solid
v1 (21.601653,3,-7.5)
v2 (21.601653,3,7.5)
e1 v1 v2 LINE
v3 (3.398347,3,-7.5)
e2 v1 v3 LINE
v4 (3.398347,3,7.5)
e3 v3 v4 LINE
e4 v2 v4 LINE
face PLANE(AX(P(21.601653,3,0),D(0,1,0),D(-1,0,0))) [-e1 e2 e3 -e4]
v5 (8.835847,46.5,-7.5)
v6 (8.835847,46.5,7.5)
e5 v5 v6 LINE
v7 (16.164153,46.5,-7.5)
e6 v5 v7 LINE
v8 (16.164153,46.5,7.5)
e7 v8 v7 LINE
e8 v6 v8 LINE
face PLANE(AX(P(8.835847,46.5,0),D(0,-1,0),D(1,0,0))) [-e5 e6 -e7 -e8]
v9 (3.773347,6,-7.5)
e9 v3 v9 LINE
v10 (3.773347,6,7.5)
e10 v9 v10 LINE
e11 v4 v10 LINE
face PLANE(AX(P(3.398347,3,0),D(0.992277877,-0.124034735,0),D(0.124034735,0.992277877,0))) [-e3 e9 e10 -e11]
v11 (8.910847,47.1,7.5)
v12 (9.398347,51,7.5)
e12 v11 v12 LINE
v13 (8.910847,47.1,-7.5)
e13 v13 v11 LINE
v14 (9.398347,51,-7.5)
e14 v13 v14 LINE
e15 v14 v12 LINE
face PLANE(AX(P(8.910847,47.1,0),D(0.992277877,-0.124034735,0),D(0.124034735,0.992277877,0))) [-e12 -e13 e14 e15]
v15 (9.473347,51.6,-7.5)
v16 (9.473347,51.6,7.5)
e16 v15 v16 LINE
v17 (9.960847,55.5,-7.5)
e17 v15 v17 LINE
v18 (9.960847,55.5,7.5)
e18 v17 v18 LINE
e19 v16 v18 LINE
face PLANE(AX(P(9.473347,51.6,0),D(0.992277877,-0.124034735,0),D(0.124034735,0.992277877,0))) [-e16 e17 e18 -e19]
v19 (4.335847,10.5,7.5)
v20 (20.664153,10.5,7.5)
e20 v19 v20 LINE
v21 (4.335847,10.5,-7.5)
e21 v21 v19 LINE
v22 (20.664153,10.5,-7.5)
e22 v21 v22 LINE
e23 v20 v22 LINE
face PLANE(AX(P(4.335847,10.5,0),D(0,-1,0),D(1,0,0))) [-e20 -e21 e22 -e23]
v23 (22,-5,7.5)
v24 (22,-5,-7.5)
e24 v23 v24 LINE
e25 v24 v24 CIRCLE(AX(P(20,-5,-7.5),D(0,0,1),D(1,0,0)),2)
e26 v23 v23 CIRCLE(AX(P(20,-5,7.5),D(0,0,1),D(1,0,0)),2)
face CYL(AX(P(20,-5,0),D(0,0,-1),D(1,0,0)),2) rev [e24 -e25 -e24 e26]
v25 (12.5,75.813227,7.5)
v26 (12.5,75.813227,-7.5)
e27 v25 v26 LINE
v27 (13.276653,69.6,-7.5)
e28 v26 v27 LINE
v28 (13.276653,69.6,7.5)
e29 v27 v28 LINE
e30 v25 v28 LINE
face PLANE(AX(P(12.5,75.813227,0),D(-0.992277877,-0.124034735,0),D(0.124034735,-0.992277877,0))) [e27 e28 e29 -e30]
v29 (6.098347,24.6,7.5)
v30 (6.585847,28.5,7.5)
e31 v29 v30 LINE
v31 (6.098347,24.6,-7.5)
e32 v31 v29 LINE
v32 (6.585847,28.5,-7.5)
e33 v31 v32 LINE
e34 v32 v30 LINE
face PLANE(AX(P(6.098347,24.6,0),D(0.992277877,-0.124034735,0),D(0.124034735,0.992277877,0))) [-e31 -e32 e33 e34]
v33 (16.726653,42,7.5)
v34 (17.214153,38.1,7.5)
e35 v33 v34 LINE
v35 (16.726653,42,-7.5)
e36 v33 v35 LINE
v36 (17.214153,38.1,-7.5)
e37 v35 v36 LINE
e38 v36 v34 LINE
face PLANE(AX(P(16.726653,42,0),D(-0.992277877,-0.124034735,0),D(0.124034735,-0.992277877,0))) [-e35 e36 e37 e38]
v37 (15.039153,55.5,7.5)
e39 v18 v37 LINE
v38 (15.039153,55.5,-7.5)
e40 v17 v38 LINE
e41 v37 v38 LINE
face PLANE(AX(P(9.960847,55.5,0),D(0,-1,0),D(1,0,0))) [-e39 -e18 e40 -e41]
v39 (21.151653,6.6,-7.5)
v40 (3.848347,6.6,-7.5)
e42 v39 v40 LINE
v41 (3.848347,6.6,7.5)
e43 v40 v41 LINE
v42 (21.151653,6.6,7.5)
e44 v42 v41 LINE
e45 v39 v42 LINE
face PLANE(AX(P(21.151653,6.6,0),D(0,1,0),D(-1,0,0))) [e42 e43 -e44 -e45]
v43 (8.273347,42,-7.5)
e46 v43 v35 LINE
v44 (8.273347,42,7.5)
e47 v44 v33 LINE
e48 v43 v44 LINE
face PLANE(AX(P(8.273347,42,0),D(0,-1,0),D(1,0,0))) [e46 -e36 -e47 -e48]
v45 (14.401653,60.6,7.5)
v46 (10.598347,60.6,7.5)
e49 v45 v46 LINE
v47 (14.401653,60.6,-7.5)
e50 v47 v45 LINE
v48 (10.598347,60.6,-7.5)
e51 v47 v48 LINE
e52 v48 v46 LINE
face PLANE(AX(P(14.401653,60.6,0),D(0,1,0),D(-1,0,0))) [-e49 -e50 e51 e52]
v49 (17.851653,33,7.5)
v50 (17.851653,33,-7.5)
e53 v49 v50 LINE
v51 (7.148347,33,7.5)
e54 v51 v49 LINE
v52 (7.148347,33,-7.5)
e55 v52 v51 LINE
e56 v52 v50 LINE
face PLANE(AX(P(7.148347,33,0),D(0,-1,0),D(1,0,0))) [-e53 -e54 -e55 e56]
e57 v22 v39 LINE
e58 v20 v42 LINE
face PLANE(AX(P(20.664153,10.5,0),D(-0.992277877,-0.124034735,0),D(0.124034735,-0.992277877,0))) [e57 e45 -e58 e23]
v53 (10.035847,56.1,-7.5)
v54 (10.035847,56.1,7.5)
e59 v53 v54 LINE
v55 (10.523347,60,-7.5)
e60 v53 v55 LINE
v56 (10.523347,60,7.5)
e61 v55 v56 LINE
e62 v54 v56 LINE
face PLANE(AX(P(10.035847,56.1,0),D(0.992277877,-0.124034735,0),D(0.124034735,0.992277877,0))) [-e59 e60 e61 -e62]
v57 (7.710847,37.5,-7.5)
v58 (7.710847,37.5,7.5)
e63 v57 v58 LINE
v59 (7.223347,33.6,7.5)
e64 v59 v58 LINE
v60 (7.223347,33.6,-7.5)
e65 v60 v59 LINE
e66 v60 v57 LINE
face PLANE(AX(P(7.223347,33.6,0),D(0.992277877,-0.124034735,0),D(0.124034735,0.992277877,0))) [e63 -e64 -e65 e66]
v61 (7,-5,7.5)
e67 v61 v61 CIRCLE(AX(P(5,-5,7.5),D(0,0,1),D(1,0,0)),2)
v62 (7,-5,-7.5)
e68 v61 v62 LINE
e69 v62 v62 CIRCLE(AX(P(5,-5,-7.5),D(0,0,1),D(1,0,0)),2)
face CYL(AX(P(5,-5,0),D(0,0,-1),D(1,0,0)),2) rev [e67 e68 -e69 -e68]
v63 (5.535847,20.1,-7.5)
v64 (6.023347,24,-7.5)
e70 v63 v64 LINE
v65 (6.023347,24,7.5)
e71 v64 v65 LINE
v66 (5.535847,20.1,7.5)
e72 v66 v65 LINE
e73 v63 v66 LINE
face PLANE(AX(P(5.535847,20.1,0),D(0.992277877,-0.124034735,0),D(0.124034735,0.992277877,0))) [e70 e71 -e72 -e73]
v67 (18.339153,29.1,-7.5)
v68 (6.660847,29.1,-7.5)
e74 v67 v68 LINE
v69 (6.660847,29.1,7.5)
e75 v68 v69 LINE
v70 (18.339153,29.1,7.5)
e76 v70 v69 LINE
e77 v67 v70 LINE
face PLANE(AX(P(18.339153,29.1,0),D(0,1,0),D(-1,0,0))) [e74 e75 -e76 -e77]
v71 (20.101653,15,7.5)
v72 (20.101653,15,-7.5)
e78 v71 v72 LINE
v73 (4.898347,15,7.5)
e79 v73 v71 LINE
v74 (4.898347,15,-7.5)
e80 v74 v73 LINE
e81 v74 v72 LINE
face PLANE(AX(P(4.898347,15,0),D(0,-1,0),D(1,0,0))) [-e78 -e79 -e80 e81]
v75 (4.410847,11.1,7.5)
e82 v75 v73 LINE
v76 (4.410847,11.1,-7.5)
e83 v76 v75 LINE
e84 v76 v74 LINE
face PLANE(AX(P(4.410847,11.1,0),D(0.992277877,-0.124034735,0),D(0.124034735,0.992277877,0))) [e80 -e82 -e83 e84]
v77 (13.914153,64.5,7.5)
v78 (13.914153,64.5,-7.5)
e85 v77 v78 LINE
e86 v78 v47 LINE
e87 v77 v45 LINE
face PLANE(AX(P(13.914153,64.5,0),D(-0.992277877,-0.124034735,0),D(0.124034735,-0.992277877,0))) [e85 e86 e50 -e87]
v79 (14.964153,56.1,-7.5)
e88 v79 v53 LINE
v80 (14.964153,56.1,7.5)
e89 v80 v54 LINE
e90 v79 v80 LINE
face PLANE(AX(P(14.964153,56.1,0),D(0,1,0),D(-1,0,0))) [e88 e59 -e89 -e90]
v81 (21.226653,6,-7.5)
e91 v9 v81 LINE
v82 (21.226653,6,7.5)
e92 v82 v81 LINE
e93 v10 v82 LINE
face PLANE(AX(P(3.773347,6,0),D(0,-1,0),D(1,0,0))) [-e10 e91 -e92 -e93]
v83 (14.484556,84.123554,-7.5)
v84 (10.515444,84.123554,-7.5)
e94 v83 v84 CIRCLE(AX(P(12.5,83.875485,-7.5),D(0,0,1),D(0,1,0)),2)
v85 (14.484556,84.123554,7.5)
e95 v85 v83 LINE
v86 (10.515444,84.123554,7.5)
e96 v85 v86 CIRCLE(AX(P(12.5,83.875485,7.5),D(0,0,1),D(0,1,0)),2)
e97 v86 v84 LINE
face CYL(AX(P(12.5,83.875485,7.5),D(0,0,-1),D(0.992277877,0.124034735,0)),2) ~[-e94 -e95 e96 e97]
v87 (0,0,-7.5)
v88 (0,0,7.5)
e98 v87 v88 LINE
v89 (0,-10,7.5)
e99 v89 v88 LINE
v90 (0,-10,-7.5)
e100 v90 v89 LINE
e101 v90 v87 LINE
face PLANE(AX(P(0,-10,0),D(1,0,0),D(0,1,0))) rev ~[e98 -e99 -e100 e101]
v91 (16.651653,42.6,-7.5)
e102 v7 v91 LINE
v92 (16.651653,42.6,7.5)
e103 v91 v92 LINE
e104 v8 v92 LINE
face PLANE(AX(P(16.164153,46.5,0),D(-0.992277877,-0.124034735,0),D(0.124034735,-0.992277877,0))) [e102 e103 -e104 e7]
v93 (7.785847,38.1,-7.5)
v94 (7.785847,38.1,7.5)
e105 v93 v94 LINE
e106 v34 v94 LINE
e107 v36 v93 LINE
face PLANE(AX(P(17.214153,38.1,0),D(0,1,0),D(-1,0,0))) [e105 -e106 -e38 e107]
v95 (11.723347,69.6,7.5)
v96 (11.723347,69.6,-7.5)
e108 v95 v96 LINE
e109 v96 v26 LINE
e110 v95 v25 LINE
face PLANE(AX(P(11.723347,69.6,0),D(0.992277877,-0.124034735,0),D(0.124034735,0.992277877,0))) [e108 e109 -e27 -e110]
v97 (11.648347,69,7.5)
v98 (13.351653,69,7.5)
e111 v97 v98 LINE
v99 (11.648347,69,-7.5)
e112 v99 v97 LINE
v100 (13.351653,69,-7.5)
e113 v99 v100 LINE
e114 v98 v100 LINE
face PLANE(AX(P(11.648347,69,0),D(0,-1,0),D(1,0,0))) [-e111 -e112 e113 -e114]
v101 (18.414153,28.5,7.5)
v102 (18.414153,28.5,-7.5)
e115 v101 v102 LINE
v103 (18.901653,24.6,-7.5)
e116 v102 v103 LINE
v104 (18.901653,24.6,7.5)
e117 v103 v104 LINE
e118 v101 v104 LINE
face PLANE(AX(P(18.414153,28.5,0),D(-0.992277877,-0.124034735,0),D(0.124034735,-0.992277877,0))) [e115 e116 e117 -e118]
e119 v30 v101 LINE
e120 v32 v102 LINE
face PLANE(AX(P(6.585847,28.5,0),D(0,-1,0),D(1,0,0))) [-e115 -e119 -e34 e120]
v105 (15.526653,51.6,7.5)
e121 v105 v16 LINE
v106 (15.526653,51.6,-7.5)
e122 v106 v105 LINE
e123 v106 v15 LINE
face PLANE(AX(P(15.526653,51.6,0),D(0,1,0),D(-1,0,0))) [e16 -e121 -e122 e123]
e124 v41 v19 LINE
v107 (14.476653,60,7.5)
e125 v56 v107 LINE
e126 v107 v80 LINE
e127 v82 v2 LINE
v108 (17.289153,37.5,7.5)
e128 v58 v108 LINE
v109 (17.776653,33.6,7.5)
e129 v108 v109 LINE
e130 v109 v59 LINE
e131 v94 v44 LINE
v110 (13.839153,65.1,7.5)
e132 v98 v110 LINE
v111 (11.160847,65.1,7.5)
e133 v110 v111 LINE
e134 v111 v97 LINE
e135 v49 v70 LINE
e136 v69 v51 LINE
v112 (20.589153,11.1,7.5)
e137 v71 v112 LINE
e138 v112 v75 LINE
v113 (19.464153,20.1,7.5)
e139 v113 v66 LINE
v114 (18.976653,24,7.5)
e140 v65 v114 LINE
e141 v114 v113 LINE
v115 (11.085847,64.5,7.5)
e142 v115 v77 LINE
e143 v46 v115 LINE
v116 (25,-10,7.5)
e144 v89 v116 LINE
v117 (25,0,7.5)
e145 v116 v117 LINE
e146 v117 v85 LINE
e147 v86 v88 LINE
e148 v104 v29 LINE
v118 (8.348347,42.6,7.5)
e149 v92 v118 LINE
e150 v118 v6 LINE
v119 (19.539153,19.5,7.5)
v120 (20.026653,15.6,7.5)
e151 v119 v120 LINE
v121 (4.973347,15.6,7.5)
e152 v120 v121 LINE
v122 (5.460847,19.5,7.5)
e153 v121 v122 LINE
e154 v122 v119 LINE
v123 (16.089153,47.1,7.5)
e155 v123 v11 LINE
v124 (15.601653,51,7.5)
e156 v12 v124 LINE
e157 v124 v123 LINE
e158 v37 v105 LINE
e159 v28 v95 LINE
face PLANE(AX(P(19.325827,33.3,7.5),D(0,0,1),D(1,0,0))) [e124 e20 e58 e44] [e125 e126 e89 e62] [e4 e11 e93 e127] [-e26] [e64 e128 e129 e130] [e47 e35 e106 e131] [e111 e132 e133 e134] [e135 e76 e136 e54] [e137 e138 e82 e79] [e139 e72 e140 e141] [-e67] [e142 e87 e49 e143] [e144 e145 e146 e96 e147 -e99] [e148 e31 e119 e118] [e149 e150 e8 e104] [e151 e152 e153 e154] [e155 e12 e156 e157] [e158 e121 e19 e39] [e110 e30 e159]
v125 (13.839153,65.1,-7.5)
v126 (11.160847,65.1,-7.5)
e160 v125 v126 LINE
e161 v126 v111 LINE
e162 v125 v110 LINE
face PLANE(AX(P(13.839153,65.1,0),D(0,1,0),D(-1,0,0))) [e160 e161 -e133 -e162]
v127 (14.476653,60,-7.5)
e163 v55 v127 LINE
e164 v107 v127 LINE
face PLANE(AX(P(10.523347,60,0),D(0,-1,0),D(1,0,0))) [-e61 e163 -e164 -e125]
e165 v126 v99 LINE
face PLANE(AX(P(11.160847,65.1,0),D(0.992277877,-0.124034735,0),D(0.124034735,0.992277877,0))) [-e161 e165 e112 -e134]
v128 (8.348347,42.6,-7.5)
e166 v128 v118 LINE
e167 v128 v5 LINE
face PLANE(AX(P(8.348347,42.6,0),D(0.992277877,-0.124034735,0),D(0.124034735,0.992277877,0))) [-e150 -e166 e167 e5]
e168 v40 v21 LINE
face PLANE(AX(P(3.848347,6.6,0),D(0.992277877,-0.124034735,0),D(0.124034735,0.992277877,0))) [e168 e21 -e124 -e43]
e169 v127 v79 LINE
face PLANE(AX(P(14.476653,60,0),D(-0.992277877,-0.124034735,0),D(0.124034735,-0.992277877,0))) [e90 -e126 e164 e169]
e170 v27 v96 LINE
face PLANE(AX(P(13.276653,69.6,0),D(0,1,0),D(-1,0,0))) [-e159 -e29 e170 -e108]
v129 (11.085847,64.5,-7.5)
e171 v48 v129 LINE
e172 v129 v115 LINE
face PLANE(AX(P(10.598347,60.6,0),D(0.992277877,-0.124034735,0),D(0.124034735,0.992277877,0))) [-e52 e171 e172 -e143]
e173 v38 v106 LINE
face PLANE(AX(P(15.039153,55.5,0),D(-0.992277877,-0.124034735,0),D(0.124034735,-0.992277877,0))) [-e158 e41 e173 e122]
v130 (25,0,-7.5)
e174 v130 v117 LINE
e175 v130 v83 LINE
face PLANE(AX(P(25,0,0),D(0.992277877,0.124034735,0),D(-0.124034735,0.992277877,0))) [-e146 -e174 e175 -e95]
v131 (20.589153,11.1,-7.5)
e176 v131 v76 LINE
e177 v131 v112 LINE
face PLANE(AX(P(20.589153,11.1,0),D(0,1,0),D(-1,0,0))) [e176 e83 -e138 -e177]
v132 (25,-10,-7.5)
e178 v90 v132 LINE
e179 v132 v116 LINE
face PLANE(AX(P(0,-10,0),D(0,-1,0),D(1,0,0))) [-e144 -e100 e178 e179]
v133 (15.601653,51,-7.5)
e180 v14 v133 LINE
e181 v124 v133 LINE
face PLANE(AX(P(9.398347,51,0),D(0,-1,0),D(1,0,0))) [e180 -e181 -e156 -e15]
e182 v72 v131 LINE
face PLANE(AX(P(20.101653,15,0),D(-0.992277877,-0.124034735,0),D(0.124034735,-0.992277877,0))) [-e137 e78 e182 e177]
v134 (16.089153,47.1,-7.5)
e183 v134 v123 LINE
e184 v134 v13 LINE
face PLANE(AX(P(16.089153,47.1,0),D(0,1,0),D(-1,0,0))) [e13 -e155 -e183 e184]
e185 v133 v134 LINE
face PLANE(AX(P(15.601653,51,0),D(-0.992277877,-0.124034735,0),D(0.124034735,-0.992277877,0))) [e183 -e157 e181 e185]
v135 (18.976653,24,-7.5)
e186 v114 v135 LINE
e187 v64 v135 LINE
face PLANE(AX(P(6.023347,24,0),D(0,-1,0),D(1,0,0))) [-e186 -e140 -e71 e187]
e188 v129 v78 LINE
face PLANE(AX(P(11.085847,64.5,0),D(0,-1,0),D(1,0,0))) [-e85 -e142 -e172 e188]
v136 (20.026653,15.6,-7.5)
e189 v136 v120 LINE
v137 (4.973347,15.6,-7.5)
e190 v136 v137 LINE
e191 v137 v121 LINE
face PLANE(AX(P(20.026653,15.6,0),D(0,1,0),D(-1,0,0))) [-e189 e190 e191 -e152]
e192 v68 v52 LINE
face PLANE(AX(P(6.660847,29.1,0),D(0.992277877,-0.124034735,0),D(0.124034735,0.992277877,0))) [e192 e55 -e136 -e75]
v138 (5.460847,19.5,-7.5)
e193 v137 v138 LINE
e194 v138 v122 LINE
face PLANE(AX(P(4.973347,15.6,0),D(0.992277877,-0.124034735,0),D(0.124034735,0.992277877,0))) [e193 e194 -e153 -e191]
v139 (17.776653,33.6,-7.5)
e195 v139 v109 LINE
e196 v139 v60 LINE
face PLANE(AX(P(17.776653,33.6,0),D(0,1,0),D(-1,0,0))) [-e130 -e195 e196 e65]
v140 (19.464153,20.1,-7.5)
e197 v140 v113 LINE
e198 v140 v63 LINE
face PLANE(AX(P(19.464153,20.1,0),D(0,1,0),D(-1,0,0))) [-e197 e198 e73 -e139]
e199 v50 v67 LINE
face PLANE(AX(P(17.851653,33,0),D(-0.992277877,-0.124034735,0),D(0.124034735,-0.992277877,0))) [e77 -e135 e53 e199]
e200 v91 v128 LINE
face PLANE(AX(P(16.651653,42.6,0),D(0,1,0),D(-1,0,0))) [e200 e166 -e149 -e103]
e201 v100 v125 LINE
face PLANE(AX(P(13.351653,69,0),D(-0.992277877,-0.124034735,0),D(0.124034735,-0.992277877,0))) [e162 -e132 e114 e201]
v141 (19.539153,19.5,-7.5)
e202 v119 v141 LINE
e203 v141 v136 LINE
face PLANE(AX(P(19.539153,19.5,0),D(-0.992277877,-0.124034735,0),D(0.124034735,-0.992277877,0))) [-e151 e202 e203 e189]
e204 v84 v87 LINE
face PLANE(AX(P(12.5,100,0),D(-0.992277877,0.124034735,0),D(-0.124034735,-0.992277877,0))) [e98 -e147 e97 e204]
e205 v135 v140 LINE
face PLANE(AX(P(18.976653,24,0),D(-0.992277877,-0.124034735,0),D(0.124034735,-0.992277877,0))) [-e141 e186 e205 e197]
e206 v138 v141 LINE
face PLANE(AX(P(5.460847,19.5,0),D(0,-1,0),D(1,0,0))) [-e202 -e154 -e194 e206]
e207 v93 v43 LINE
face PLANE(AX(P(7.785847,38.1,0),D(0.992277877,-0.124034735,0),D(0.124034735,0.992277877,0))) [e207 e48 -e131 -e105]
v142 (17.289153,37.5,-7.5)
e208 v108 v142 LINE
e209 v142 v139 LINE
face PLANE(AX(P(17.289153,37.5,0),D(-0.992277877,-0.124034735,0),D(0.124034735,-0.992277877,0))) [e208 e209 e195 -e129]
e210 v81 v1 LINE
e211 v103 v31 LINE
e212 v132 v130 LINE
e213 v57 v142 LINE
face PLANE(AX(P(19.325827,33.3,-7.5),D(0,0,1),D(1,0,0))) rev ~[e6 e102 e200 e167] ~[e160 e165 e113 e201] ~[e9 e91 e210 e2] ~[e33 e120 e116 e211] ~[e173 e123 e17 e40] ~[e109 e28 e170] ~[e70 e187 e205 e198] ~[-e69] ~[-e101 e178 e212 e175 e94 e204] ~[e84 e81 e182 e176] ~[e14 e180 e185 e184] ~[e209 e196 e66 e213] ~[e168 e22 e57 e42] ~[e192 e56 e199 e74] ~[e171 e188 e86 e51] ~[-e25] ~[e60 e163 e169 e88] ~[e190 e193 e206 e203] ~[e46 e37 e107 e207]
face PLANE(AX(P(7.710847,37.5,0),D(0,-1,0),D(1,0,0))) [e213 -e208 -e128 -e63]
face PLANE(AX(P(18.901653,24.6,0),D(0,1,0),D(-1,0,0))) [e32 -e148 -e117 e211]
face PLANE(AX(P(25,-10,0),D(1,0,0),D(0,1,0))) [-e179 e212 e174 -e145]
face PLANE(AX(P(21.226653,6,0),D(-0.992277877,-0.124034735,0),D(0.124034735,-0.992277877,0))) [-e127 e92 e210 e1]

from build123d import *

# Parameters (mm, degrees)
F0_W     = 25
F0_H     = 10
F0_R     = 2
F1_DEPTH = 7.5
F2_R     = 2


# Not quite as in the source:
# - a feature names something its author has since deleted; it is built from what else it names


with BuildPart() as f1:
    # F0 (on Top) → F1 (new body, symmetric)
    with BuildSketch(Plane.XY):
        Polygon((17.8516533444, 33), (20.875, 33), (20.8, 33.6), (17.7766533444, 33.6), align=None)
        Polygon((17.7766533444, 33.6), (20.8, 33.6), (20.3125, 37.5), (17.2891533444, 37.5), align=None)
        Polygon((17.2891533444, 37.5), (20.3125, 37.5), (20.2375, 38.1), (17.2141533444, 38.1), align=None)
        Polygon((17.2141533444, 38.1), (20.2375, 38.1), (19.75, 42), (16.7266533444, 42), align=None)
        Polygon((16.7266533444, 42), (19.75, 42), (19.675, 42.6), (16.6516533444, 42.6), align=None)
        Polygon((16.6516533444, 42.6), (19.675, 42.6), (19.1875, 46.5), (16.1641533444, 46.5), align=None)
        Polygon((16.1641533444, 46.5), (19.1875, 46.5), (19.1125, 47.1), (16.0891533444, 47.1), align=None)
        Polygon((16.0891533444, 47.1), (19.1125, 47.1), (18.625, 51), (15.6016533444, 51), align=None)
        Polygon((15.6016533444, 51), (18.625, 51), (18.55, 51.6), (15.5266533444, 51.6), align=None)
        Polygon((15.5266533444, 51.6), (18.55, 51.6), (18.0625, 55.5), (15.0391533444, 55.5), align=None)
        Polygon((15.0391533444, 55.5), (18.0625, 55.5), (17.9875, 56.1), (14.9641533444, 56.1), align=None)
        Polygon((14.9641533444, 56.1), (17.9875, 56.1), (17.5, 60), (14.4766533444, 60), align=None)
        Polygon((14.4766533444, 60), (17.5, 60), (17.425, 60.6), (14.4016533444, 60.6), align=None)
        Polygon((14.4016533444, 60.6), (17.425, 60.6), (16.9375, 64.5), (13.9141533444, 64.5), align=None)
        Polygon((13.9141533444, 64.5), (16.9375, 64.5), (16.8625, 65.1), (13.8391533444, 65.1), align=None)
        Polygon((13.8391533444, 65.1), (16.8625, 65.1), (16.375, 69), (13.3516533444, 69), align=None)
        Polygon((13.3516533444, 69), (16.375, 69), (16.3, 69.6), (13.2766533444, 69.6), align=None)
        Polygon((12.5, 100), (8.7, 69.6), (11.7233466556, 69.6), (12.5, 75.8132267551), (13.2766533444, 69.6), (16.3, 69.6), align=None)
        with Locations((12.5, -5)):
            Rectangle(F0_W, F0_H)
        with Locations((5, -5)):
            Circle(F0_R, mode=Mode.SUBTRACT)
        with Locations((20, -5)):
            Circle(F0_R, mode=Mode.SUBTRACT)
        Polygon((8.0625, 64.5), (7.575, 60.6), (10.5983466556, 60.6), (11.0858466556, 64.5), align=None)
        Polygon((8.7, 69.6), (8.625, 69), (11.6483466556, 69), (11.7233466556, 69.6), align=None)
        Polygon((8.1375, 65.1), (8.0625, 64.5), (11.0858466556, 64.5), (11.1608466556, 65.1), align=None)
        Polygon((8.625, 69), (8.1375, 65.1), (11.1608466556, 65.1), (11.6483466556, 69), align=None)
        Polygon((6.375, 51), (5.8875, 47.1), (8.9108466556, 47.1), (9.3983466556, 51), align=None)
        Polygon((7.5, 60), (7.0125, 56.1), (10.0358466556, 56.1), (10.5233466556, 60), align=None)
        Polygon((7.0125, 56.1), (6.9375, 55.5), (9.9608466556, 55.5), (10.0358466556, 56.1), align=None)
        Polygon((7.575, 60.6), (7.5, 60), (10.5233466556, 60), (10.5983466556, 60.6), align=None)
        Polygon((6.45, 51.6), (6.375, 51), (9.3983466556, 51), (9.4733466556, 51.6), align=None)
        Polygon((6.9375, 55.5), (6.45, 51.6), (9.4733466556, 51.6), (9.9608466556, 55.5), align=None)
        Polygon((5.25, 42), (4.7625, 38.1), (7.7858466556, 38.1), (8.2733466556, 42), align=None)
        Polygon((4.2, 33.6), (4.125, 33), (7.1483466556, 33), (7.2233466556, 33.6), align=None)
        Polygon((5.325, 42.6), (5.25, 42), (8.2733466556, 42), (8.3483466556, 42.6), align=None)
        Polygon((5.8125, 46.5), (5.325, 42.6), (8.3483466556, 42.6), (8.8358466556, 46.5), align=None)
        Polygon((4.6875, 37.5), (4.2, 33.6), (7.2233466556, 33.6), (7.7108466556, 37.5), align=None)
        Polygon((4.125, 33), (0, 0), (25, 0), (20.875, 33), (17.8516533444, 33), (18.3391533444, 29.1), (18.4141533444, 28.5), (18.9016533444, 24.6), (18.9766533444, 24), (19.4641533444, 20.1), (19.5391533444, 19.5), (20.0266533444, 15.6), (20.1016533444, 15), (20.5891533444, 11.1), (20.6641533444, 10.5), (21.1516533444, 6.6), (21.2266533444, 6), (21.6016533444, 3), (3.3983466556, 3), (3.7733466556, 6), (3.8483466556, 6.6), (4.3358466556, 10.5), (4.4108466556, 11.1), (4.8983466556, 15), (4.9733466556, 15.6), (5.4608466556, 19.5), (5.5358466556, 20.1), (6.0233466556, 24), (6.0983466556, 24.6), (6.5858466556, 28.5), (6.6608466556, 29.1), (7.1483466556, 33), align=None)
        Polygon((5.8875, 47.1), (5.8125, 46.5), (8.8358466556, 46.5), (8.9108466556, 47.1), align=None)
        Polygon((4.7625, 38.1), (4.6875, 37.5), (7.7108466556, 37.5), (7.7858466556, 38.1), align=None)
        Polygon((21.1516533444, 6.6), (3.8483466556, 6.6), (3.7733466556, 6), (21.2266533444, 6), align=None)
        Polygon((20.5891533444, 11.1), (4.4108466556, 11.1), (4.3358466556, 10.5), (20.6641533444, 10.5), align=None)
        Polygon((20.0266533444, 15.6), (4.9733466556, 15.6), (4.8983466556, 15), (20.1016533444, 15), align=None)
        Polygon((19.4641533444, 20.1), (5.5358466556, 20.1), (5.4608466556, 19.5), (19.5391533444, 19.5), align=None)
        Polygon((18.9016533444, 24.6), (6.0983466556, 24.6), (6.0233466556, 24), (18.9766533444, 24), align=None)
        Polygon((18.3391533444, 29.1), (6.6608466556, 29.1), (6.5858466556, 28.5), (18.4141533444, 28.5), align=None)
        Polygon((7.2233466556, 33.6), (7.1483466556, 33), (17.8516533444, 33), (17.7766533444, 33.6), align=None)
        Polygon((7.7858466556, 38.1), (7.7108466556, 37.5), (17.2891533444, 37.5), (17.2141533444, 38.1), align=None)
        Polygon((8.3483466556, 42.6), (8.2733466556, 42), (16.7266533444, 42), (16.6516533444, 42.6), align=None)
        Polygon((8.9108466556, 47.1), (8.8358466556, 46.5), (16.1641533444, 46.5), (16.0891533444, 47.1), align=None)
        Polygon((9.4733466556, 51.6), (9.3983466556, 51), (15.6016533444, 51), (15.5266533444, 51.6), align=None)
        Polygon((10.0358466556, 56.1), (9.9608466556, 55.5), (15.0391533444, 55.5), (14.9641533444, 56.1), align=None)
        Polygon((10.5983466556, 60.6), (10.5233466556, 60), (14.4766533444, 60), (14.4016533444, 60.6), align=None)
        Polygon((11.1608466556, 65.1), (11.0858466556, 64.5), (13.9141533444, 64.5), (13.8391533444, 65.1), align=None)
        Polygon((11.7233466556, 69.6), (11.6483466556, 69), (13.3516533444, 69), (13.2766533444, 69.6), align=None)
    extrude(amount=F1_DEPTH, both=True)

    # F2
    f2_edges = [f1.edges().sort_by_distance(p)[0] for p in [
        (12.5, 100, 0),
    ]]
    fillet(f2_edges, radius=F2_R)


solid = f1.part
